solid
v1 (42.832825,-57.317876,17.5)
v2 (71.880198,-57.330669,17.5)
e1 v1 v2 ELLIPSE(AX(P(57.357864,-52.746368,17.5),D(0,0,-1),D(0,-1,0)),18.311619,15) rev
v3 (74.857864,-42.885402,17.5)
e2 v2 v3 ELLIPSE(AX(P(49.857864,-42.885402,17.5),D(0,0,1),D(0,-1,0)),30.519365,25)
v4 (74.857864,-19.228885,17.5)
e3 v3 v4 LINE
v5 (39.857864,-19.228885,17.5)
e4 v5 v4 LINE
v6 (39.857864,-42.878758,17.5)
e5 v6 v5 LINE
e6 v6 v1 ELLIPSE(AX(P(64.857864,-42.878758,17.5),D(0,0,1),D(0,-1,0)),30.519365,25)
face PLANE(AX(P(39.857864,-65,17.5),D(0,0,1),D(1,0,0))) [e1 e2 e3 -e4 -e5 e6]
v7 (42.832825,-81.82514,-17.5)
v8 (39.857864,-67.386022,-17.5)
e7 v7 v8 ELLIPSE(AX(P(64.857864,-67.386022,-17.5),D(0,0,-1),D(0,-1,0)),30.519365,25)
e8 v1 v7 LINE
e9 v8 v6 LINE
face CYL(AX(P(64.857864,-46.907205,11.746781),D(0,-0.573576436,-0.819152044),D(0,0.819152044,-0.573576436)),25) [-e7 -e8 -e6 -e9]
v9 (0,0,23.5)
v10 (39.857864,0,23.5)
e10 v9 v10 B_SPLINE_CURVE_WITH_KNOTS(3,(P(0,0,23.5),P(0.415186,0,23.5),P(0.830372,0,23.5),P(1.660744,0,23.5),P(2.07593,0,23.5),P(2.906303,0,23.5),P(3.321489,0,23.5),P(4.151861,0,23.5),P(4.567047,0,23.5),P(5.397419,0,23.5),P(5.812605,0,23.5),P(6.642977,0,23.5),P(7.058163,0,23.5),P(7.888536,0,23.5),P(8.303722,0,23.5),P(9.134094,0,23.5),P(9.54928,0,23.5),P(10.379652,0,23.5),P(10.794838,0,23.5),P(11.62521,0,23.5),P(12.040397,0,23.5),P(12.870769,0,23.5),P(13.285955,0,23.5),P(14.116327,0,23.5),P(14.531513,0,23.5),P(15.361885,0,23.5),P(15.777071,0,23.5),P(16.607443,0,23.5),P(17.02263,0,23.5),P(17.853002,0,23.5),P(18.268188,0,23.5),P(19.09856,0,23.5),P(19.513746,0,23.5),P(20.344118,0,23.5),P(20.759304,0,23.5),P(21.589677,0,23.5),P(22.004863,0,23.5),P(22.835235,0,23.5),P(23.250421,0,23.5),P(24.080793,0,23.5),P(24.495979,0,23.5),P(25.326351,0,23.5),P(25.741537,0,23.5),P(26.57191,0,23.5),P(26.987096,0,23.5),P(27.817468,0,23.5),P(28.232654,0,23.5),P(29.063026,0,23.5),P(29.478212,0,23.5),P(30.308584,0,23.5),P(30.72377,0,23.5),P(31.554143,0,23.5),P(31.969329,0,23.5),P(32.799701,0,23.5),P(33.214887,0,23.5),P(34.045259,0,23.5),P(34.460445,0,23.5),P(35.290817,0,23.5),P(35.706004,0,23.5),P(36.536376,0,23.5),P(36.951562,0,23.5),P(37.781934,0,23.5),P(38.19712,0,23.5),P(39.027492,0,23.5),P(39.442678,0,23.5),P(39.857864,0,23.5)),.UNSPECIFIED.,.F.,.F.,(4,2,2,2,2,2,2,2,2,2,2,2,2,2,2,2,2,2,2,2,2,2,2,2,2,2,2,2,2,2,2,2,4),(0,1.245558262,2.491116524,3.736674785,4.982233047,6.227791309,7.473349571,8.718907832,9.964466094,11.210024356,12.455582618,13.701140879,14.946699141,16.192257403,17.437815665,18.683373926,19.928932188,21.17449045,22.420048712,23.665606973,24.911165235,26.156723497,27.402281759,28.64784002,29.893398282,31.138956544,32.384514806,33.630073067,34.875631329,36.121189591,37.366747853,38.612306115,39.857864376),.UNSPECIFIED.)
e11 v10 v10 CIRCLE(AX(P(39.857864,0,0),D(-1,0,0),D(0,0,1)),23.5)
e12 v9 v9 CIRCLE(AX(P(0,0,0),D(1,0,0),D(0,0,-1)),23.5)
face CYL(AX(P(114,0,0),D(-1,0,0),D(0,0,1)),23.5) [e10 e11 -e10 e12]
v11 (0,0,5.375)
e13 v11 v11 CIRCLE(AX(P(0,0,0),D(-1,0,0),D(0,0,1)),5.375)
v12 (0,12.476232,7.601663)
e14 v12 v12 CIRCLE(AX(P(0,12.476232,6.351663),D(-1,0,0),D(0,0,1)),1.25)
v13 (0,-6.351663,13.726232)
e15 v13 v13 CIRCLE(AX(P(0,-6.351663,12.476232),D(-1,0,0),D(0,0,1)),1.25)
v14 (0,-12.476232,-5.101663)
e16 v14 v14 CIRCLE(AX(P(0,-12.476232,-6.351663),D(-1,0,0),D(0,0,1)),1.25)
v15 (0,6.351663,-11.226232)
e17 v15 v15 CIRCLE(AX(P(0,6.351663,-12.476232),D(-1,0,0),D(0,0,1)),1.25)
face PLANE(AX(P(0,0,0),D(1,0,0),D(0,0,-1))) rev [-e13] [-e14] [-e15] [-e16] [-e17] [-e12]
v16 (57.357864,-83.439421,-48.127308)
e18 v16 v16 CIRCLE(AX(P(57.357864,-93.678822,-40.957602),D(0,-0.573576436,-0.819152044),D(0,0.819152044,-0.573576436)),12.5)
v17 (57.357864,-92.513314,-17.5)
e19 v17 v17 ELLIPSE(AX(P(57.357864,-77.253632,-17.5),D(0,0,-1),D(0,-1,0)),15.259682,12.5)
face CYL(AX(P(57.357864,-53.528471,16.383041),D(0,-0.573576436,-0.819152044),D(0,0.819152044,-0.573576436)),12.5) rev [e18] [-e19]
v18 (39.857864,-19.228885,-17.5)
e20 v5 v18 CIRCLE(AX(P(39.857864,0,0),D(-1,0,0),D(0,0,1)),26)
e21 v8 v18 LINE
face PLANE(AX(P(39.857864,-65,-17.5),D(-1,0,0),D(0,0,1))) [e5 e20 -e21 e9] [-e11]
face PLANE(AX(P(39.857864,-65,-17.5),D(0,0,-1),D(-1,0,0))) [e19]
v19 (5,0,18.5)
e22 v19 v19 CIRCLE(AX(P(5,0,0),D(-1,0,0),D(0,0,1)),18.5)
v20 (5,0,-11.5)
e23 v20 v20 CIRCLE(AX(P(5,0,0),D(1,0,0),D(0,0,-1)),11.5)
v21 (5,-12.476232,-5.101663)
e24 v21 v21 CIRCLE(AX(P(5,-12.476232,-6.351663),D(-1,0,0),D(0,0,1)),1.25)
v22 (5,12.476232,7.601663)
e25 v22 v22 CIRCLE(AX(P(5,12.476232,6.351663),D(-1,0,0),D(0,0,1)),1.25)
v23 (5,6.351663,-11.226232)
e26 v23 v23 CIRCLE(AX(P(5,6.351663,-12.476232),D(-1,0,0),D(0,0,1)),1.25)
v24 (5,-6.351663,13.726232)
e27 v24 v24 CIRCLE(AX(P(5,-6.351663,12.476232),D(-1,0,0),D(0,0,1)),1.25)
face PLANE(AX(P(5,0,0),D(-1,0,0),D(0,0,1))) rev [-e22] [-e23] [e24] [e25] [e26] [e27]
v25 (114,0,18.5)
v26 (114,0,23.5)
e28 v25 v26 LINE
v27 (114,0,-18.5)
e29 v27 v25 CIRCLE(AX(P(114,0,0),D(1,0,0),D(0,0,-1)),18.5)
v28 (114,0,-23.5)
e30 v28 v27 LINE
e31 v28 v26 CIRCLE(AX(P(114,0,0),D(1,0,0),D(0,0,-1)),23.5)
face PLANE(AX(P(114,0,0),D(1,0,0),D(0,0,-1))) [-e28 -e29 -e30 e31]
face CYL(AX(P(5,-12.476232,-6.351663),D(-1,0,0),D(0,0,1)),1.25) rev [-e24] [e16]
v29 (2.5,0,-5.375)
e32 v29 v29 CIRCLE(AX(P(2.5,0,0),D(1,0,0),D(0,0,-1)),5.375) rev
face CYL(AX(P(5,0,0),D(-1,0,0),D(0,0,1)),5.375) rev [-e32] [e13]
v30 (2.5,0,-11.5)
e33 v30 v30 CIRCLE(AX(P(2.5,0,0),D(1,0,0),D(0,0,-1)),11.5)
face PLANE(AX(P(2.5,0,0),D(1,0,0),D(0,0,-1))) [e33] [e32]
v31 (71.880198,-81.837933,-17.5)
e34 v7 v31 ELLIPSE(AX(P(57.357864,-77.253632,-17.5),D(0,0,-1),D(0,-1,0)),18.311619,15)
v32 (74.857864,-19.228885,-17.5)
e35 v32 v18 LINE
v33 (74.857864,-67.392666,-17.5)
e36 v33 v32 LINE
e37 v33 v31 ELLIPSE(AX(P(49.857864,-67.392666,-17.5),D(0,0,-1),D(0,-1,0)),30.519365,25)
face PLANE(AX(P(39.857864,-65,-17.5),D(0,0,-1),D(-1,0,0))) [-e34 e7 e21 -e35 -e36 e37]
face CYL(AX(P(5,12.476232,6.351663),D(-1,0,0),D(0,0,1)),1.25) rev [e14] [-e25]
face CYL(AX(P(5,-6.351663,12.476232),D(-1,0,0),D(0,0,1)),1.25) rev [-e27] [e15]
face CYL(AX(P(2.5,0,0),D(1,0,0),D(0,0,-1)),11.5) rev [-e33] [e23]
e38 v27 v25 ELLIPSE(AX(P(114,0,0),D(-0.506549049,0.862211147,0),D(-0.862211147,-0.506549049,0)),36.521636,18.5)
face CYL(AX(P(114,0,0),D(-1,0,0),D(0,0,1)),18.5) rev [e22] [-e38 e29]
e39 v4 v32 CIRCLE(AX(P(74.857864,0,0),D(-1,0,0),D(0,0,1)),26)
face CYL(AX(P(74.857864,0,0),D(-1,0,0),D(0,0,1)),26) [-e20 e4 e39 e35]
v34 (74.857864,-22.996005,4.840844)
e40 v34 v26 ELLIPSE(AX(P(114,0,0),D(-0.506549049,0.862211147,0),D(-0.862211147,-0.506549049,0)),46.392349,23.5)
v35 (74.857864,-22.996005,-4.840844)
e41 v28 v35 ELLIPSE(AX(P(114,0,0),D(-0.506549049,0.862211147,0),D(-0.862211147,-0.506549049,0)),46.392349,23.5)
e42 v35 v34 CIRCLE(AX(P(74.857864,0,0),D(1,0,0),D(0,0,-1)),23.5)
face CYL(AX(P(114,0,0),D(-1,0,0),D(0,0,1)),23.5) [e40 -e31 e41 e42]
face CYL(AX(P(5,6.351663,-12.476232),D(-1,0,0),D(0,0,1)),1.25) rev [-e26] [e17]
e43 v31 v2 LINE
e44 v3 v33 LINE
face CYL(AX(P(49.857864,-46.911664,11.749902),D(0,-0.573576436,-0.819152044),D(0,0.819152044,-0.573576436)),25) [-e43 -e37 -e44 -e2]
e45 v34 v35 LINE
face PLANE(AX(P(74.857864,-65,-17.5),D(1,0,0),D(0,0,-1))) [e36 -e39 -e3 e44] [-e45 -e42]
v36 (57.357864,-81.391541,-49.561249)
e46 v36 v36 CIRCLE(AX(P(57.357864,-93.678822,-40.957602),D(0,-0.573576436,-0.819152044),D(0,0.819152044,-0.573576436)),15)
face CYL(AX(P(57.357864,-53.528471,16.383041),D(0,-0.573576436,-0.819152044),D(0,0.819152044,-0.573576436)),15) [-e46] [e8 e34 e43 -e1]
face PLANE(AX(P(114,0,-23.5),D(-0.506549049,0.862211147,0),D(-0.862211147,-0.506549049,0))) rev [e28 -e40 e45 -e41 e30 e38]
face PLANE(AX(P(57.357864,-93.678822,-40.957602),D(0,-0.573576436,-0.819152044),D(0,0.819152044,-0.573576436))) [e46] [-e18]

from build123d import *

# Parameters (mm, degrees)
CROQUIS1_R              = 23.5
CROQUIS1_R_2            = 18.5
SALIENTE_EXTRUIR1_DEPTH = 114
CROQUIS2_R              = 23.5
CROQUIS2_R_2            = 5.375
CROQUIS2_R_3            = 1.25
SALIENTE_EXTRUIR2_DEPTH = 5
CORTAR_EXTRUIR1_DEPTH   = 23.5
CROQUIS6_R              = 11.5
CORTAR_EXTRUIR2_DEPTH   = 2.5
CROQUIS17_W             = 35
CROQUIS17_H             = 35
SALIENTE_EXTRUIR3_DEPTH = 65
CROQUIS18_R             = 15
CROQUIS18_R_2           = 12.5
SALIENTE_EXTRUIR4_DEPTH = 70
CROQUIS26_W             = 35
CROQUIS26_H             = 35
SALIENTE_EXTRUIR8_DEPTH = 40
CORTAR_EXTRUIR4_DEPTH   = 167.48351172
CROQUIS27_R             = 26
SALIENTE_EXTRUIR9_DEPTH = 35
CORTAR_EXTRUIR7_START   = -35
CROQUIS28_R             = 18.5
CORTAR_EXTRUIR7_DEPTH   = 35
CROQUIS25_W             = 17.40616007
CROQUIS25_H             = 44.473979809
CORTAR_EXTRUIR8_DEPTH   = 35
REDONDEO7_R             = 25


with BuildPart() as part:
    # Croquis1 → Saliente-Extruir1 (new body)
    with BuildSketch(Plane(origin=(0, 0, 0), x_dir=(0, 0, -1), z_dir=(1, 0, 0))):
        with Locations(Location((0, 0, 0), (0, 0, 180))):
            Circle(CROQUIS1_R)
        with Locations(Location((0, 0, 0), (0, 0, 180))):
            Circle(CROQUIS1_R_2, mode=Mode.SUBTRACT)
    extrude(amount=SALIENTE_EXTRUIR1_DEPTH)

    # Croquis2 → Saliente-Extruir2 (add)
    with BuildSketch(Plane.ZY):
        Circle(CROQUIS2_R)
        Circle(CROQUIS2_R_2, mode=Mode.SUBTRACT)
        with Locations((-12.476232327, 6.351663319)):
            Circle(CROQUIS2_R_3, mode=Mode.SUBTRACT)
        with Locations((-6.351663319, -12.476232327)):
            Circle(CROQUIS2_R_3, mode=Mode.SUBTRACT)
        with Locations((12.476232327, -6.351663319)):
            Circle(CROQUIS2_R_3, mode=Mode.SUBTRACT)
        with Locations((6.351663319, 12.476232327)):
            Circle(CROQUIS2_R_3, mode=Mode.SUBTRACT)
    extrude(amount=-SALIENTE_EXTRUIR2_DEPTH)

    # Croquis4 → Cortar-Extruir1 (cut, symmetric)
    with BuildSketch(Plane.XY):
        Polygon((114, 0), (74, -23.5), (114, -23.5), align=None)
    extrude(amount=CORTAR_EXTRUIR1_DEPTH, both=True, mode=Mode.SUBTRACT)

    # Croquis6 → Cortar-Extruir2 (cut)
    with BuildSketch(Plane(origin=(5, 0, 0), x_dir=(0, 0, -1), z_dir=(1, 0, 0))):
        Circle(CROQUIS6_R)
    extrude(amount=-CORTAR_EXTRUIR2_DEPTH, mode=Mode.SUBTRACT)

    # Croquis17 → Saliente-Extruir3 (add)
    with BuildSketch(Plane(origin=(0, 0, 0), x_dir=(1, 0, 0), z_dir=(0, 1, 0))):
        with Locations((57.357864376, 0)):
            Rectangle(CROQUIS17_W, CROQUIS17_H)
    extrude(amount=-SALIENTE_EXTRUIR3_DEPTH)

    # Croquis18 → Saliente-Extruir4 (add)
    with BuildSketch(Plane(origin=(57.357864376, -93.678821818, -40.957602214), x_dir=(-1, 0, 0), z_dir=(-3.776705924582896e-15, -0.5735764363510474, -0.8191520442889909))):
        with Locations(Location((0, 0, 0), (0, 0, 90))):
            Circle(CROQUIS18_R)
        with Locations(Location((0, 0, 0), (0, 0, 90))):
            Circle(CROQUIS18_R_2, mode=Mode.SUBTRACT)
    extrude(amount=-SALIENTE_EXTRUIR4_DEPTH)

    # Croquis26 → Saliente-Extruir8 (add)
    with BuildSketch(Plane.XZ.offset(65)):
        with Locations((57.357864376, 0)):
            Rectangle(CROQUIS26_W, CROQUIS26_H)
    extrude(amount=SALIENTE_EXTRUIR8_DEPTH)

    # Croquis23 → Cortar-Extruir4 (cut, through all)
    with BuildSketch(Plane(origin=(0, -50.063167159, -71.49761239), x_dir=(-0.9999999349220849, 0.0002955264288911758, -0.00020692983324517575), z_dir=(-3.786088196428006e-15, -0.5735764363510474, -0.819152044288991))):
        with BuildLine():
            Line((-72.377069861, -53.224186351), (-106.285107353, -53.224186351))
            ThreePointArc((-106.285107353, -53.224186351), (-57.377069861, -102.132223842), (-8.46903237, -53.224186351))
            Line((-8.46903237, -53.224186351), (-42.377069861, -53.224186351))
            ThreePointArc((-42.377069861, -53.224186351), (-57.377069861, -68.224186351), (-72.377069861, -53.224186351))
        make_face()
    extrude(amount=-CORTAR_EXTRUIR4_DEPTH, mode=Mode.SUBTRACT)

    # Chaflán1
    # the kernel refuses this chamfer: 5 mm, written as the material it adds along each edge
    with BuildSketch(Plane(origin=(72.3578634, -83.748374972, -26.766019567), x_dir=(0.9996432935674607, 0.021877427608148432, -0.015318739727867424), z_dir=(3.786088196428006e-15, 0.5735764363510474, 0.8191520442889909))) as chafl_n1_piece_1_section:
        with BuildLine():
            Line((4.52468849, 0), (-0.739014204, -3.853882904))
            Line((-0.739014204, -3.853882904), (-0.835126609, -3.826271211))
            ThreePointArc((-0.835126609, -3.826271211), (-0.28053556, -1.941134087), (-0.099963359, 0.002706805))
            Line((-0.099963359, 0.002706805), (0.002706805, 0.099963359))
            ThreePointArc((0.002706805, 0.099963359), (2.263393477, 0.038748553), (4.527395295, 0.099963359))
            Line((4.527395295, 0.099963359), (4.52468849, 0))
        make_face()
    chafl_n1_piece_1 = extrude(amount=65.350553059, mode=Mode.PRIVATE)
    chafl_n1_piece_1 = split(chafl_n1_piece_1, bisect_by=Plane(origin=(74.857864376, -66.861949612, -0.210272202), z_dir=(-1, 0, 0)), keep=Keep.TOP, mode=Mode.PRIVATE)
    chafl_n1_piece_1 = split(chafl_n1_piece_1, bisect_by=Plane(origin=(73.269162948, -66.861949612, -17.5), z_dir=(0, 0, 1)), keep=Keep.TOP, mode=Mode.PRIVATE)
    chafl_n1_piece_1 = split(chafl_n1_piece_1, bisect_by=Plane(origin=(73.269162948, -66.861949612, 17.5), z_dir=(0, 0, -1)), keep=Keep.TOP, mode=Mode.PRIVATE)
    chafl_n1_piece_1 = split(chafl_n1_piece_1, bisect_by=Plane(origin=(73.269162948, -54.679062597, 17.188693604), z_dir=(-3.776705924582896e-15, -0.5735764363510474, -0.8191520442889909)), keep=Keep.TOP, mode=Mode.PRIVATE)
    add(chafl_n1_piece_1)
    with BuildSketch(Plane(origin=(72.3578634, -83.748374972, -26.766019567), x_dir=(0.9996432935674607, 0.021877427608148432, -0.015318739727867424), z_dir=(3.786088196428006e-15, 0.5735764363510474, 0.8191520442889909))) as chafl_n1_piece_2_section:
        with BuildLine():
            Line((4.52468849, 0), (-0.739014204, -3.853882904))
            Line((-0.739014204, -3.853882904), (-0.835126609, -3.826271211))
            ThreePointArc((-0.835126609, -3.826271211), (-0.28053556, -1.941134087), (-0.099963359, 0.002706805))
            Line((-0.099963359, 0.002706805), (0.002706805, 0.099963359))
            ThreePointArc((0.002706805, 0.099963359), (2.263393477, 0.038748553), (4.527395295, 0.099963359))
            Line((4.527395295, 0.099963359), (4.52468849, 0))
        make_face()
    chafl_n1_piece_2 = extrude(amount=65.350553059, mode=Mode.PRIVATE)
    chafl_n1_piece_2 = split(chafl_n1_piece_2, bisect_by=Plane(origin=(72.413190885, -56.144513508, 17.5), z_dir=(0, 0, 1)), keep=Keep.TOP, mode=Mode.PRIVATE)
    chafl_n1_piece_2 = split(chafl_n1_piece_2, bisect_by=Plane(origin=(72.413190885, -55.943525833, 18.074080294), z_dir=(-3.776705924582896e-15, -0.5735764363510474, -0.8191520442889909)), keep=Keep.TOP, mode=Mode.PRIVATE)
    add(chafl_n1_piece_2)
    with BuildSketch(Plane(origin=(72.3578634, -83.748374972, -26.766019567), x_dir=(0.9996432935674607, 0.021877427608148432, -0.015318739727867424), z_dir=(3.786088196428006e-15, 0.5735764363510474, 0.8191520442889909))) as chafl_n1_piece_3_section:
        with BuildLine():
            Line((4.52468849, 0), (-0.739014204, -3.853882904))
            Line((-0.739014204, -3.853882904), (-0.835126609, -3.826271211))
            ThreePointArc((-0.835126609, -3.826271211), (-0.28053556, -1.941134087), (-0.099963359, 0.002706805))
            Line((-0.099963359, 0.002706805), (0.002706805, 0.099963359))
            ThreePointArc((0.002706805, 0.099963359), (2.263393477, 0.038748553), (4.527395295, 0.099963359))
            Line((4.527395295, 0.099963359), (4.52468849, 0))
        make_face()
    chafl_n1_piece_3 = extrude(amount=65.350553059, mode=Mode.PRIVATE)
    chafl_n1_piece_3 = split(chafl_n1_piece_3, bisect_by=Plane(origin=(74.857864376, -53.740671542, 17.111139805), z_dir=(-1, 0, 0)), keep=Keep.TOP, mode=Mode.PRIVATE)
    chafl_n1_piece_3 = split(chafl_n1_piece_3, bisect_by=Plane(origin=(73.550120659, -53.740671542, 17.5), z_dir=(0, 0, -1)), keep=Keep.TOP, mode=Mode.PRIVATE)
    chafl_n1_piece_3 = split(chafl_n1_piece_3, bisect_by=Plane(origin=(73.550120659, -54.012954381, 16.72227961), z_dir=(3.776705924582896e-15, 0.5735764363510474, 0.8191520442889909)), keep=Keep.TOP, mode=Mode.PRIVATE)
    add(chafl_n1_piece_3)
    with BuildSketch(Plane(origin=(42.357865352, -83.735162365, -26.766019567), x_dir=(-0.9996237628252937, 0.022468263900174177, -0.01573244775338249), z_dir=(3.786088196428006e-15, 0.5735764363510474, 0.8191520442889909))) as chafl_n1_piece_4_section:
        with BuildLine():
            Line((4.52468849, 0), (-0.739014204, 3.853882904))
            Line((-0.739014204, 3.853882904), (-0.835126609, 3.826271211))
            ThreePointArc((-0.835126609, 3.826271211), (-0.28053556, 1.941134087), (-0.099963359, -0.002706805))
            Line((-0.099963359, -0.002706805), (0.002706805, -0.099963359))
            ThreePointArc((0.002706805, -0.099963359), (2.263393477, -0.038748553), (4.527395295, -0.099963359))
            Line((4.527395295, -0.099963359), (4.52468849, 0))
        make_face()
    chafl_n1_piece_4 = extrude(amount=65.350553059, mode=Mode.PRIVATE)
    chafl_n1_piece_4 = split(chafl_n1_piece_4, bisect_by=Plane(origin=(41.445758281, -66.849730794, -17.5), z_dir=(0, 0, 1)), keep=Keep.TOP, mode=Mode.PRIVATE)
    chafl_n1_piece_4 = split(chafl_n1_piece_4, bisect_by=Plane(origin=(39.857864376, -66.849730794, -0.212642444), z_dir=(1, 0, 0)), keep=Keep.TOP, mode=Mode.PRIVATE)
    chafl_n1_piece_4 = split(chafl_n1_piece_4, bisect_by=Plane(origin=(41.445758281, -66.849730794, 17.5), z_dir=(0, 0, -1)), keep=Keep.TOP, mode=Mode.PRIVATE)
    chafl_n1_piece_4 = split(chafl_n1_piece_4, bisect_by=Plane(origin=(41.445758281, -54.669749998, 17.182172852), z_dir=(-3.776705924582896e-15, -0.5735764363510474, -0.8191520442889909)), keep=Keep.TOP, mode=Mode.PRIVATE)
    add(chafl_n1_piece_4)
    with BuildSketch(Plane(origin=(42.357865352, -83.735162365, -26.766019567), x_dir=(-0.9996237628252937, 0.022468263900174177, -0.01573244775338249), z_dir=(3.786088196428006e-15, 0.5735764363510474, 0.8191520442889909))) as chafl_n1_piece_5_section:
        with BuildLine():
            Line((4.52468849, 0), (-0.739014204, 3.853882904))
            Line((-0.739014204, 3.853882904), (-0.835126609, 3.826271211))
            ThreePointArc((-0.835126609, 3.826271211), (-0.28053556, 1.941134087), (-0.099963359, -0.002706805))
            Line((-0.099963359, -0.002706805), (0.002706805, -0.099963359))
            ThreePointArc((0.002706805, -0.099963359), (2.263393477, -0.038748553), (4.527395295, -0.099963359))
            Line((4.527395295, -0.099963359), (4.52468849, 0))
        make_face()
    chafl_n1_piece_5 = extrude(amount=65.350553059, mode=Mode.PRIVATE)
    chafl_n1_piece_5 = split(chafl_n1_piece_5, bisect_by=Plane(origin=(42.30505322, -56.139333536, 17.5), z_dir=(0, 0, 1)), keep=Keep.TOP, mode=Mode.PRIVATE)
    chafl_n1_piece_5 = split(chafl_n1_piece_5, bisect_by=Plane(origin=(42.30505322, -55.939365699, 18.071167337), z_dir=(-3.776705924582896e-15, -0.5735764363510474, -0.8191520442889909)), keep=Keep.TOP, mode=Mode.PRIVATE)
    add(chafl_n1_piece_5)
    with BuildSketch(Plane(origin=(42.357865352, -83.735162365, -26.766019567), x_dir=(-0.9996237628252937, 0.022468263900174177, -0.01573244775338249), z_dir=(3.786088196428006e-15, 0.5735764363510474, 0.8191520442889909))) as chafl_n1_piece_6_section:
        with BuildLine():
            Line((4.52468849, 0), (-0.739014204, 3.853882904))
            Line((-0.739014204, 3.853882904), (-0.835126609, 3.826271211))
            ThreePointArc((-0.835126609, 3.826271211), (-0.28053556, 1.941134087), (-0.099963359, -0.002706805))
            Line((-0.099963359, -0.002706805), (0.002706805, -0.099963359))
            ThreePointArc((0.002706805, -0.099963359), (2.263393477, -0.038748553), (4.527395295, -0.099963359))
            Line((4.527395295, -0.099963359), (4.52468849, 0))
        make_face()
    chafl_n1_piece_6 = extrude(amount=65.350553059, mode=Mode.PRIVATE)
    chafl_n1_piece_6 = split(chafl_n1_piece_6, bisect_by=Plane(origin=(39.857864376, -53.732391069, 17.108811543), z_dir=(1, 0, 0)), keep=Keep.TOP, mode=Mode.PRIVATE)
    chafl_n1_piece_6 = split(chafl_n1_piece_6, bisect_by=Plane(origin=(41.16543505, -53.732391069, 17.5), z_dir=(0, 0, -1)), keep=Keep.TOP, mode=Mode.PRIVATE)
    chafl_n1_piece_6 = split(chafl_n1_piece_6, bisect_by=Plane(origin=(41.16543505, -54.006304175, 16.717623086), z_dir=(3.776705924582896e-15, 0.5735764363510474, 0.8191520442889909)), keep=Keep.TOP, mode=Mode.PRIVATE)
    add(chafl_n1_piece_6)

    # Croquis27 → Saliente-Extruir9 (add)
    with BuildSketch(Plane.ZY.offset(-39.857864376)):
        Circle(CROQUIS27_R)
    extrude(amount=-SALIENTE_EXTRUIR9_DEPTH)

    # Croquis28 → Cortar-Extruir7 (cut)
    with BuildSketch(Plane(origin=(74.857864376, 0, 0), x_dir=(0, 0, -1), z_dir=(1, 0, 0)).offset(CORTAR_EXTRUIR7_START)):
        with Locations(Location((0, 0, 0), (0, 0, 180))):
            Circle(CROQUIS28_R)
    extrude(amount=CORTAR_EXTRUIR7_DEPTH, mode=Mode.SUBTRACT)

    # Croquis25 → Cortar-Extruir8 (cut)
    with BuildSketch(Plane.ZY.offset(-39.857864376)):
        with Locations((26.203080035, -59.941786128)):
            Rectangle(CROQUIS25_W, CROQUIS25_H)
    extrude(amount=-CORTAR_EXTRUIR8_DEPTH, mode=Mode.SUBTRACT)

    # Redondeo7
    # the kernel refuses this fillet: 25 mm, written as the material it takes off along each edge
    with BuildSketch(Plane(origin=(74.857864376, -92.687057178, -37.012402739), x_dir=(-0.7907902899042683, -0.5013924657655986, 0.3510787841305944), z_dir=(0, 0.5735764363510114, 0.8191520442890161))) as redondeo7_piece_1:
        with BuildLine():
            CenterArc((13.937730496, -22.836907045), REDONDEO7_R, 114.009742732, 28.249684026)
            Line((-5.832026752, -7.534727515), (-6.227421897, -7.228683925))
            Line((-6.227421897, -7.228683925), (-0.395395145, 0.306043591))
            Line((-0.395395145, 0.306043591), (0, 0.5))
            ThreePointArc((0, 0.5), (1.882715511, 0.5), (3.561985032, 0.456738141))
            Line((3.561985032, 0.456738141), (3.765431021, 0))
        make_face()
    extrude(amount=90.367601464, mode=Mode.SUBTRACT)
    with BuildSketch(Plane(origin=(39.857864376, -40.84904598, 36.999342745), x_dir=(0.7903484372835544, -0.5018597340768438, 0.3514059689244948), z_dir=(0, -0.5735764363510115, -0.819152044289016))) as redondeo7_piece_2:
        with BuildLine():
            CenterArc((13.925156189, -22.841917455), REDONDEO7_R, 113.98150583, 28.236579598)
            Line((-5.833554743, -7.525477193), (-6.228728961, -7.219148388))
            Line((-6.228728961, -7.219148388), (-0.395174219, 0.306328805))
            Line((-0.395174219, 0.306328805), (0, 0.5))
            ThreePointArc((0, 0.5), (1.882056296, 0.5), (3.56089172, 0.456838349))
            Line((3.56089172, 0.456838349), (3.764112592, 0))
        make_face()
    extrude(amount=90.335714849, mode=Mode.SUBTRACT)


solid = part.part
